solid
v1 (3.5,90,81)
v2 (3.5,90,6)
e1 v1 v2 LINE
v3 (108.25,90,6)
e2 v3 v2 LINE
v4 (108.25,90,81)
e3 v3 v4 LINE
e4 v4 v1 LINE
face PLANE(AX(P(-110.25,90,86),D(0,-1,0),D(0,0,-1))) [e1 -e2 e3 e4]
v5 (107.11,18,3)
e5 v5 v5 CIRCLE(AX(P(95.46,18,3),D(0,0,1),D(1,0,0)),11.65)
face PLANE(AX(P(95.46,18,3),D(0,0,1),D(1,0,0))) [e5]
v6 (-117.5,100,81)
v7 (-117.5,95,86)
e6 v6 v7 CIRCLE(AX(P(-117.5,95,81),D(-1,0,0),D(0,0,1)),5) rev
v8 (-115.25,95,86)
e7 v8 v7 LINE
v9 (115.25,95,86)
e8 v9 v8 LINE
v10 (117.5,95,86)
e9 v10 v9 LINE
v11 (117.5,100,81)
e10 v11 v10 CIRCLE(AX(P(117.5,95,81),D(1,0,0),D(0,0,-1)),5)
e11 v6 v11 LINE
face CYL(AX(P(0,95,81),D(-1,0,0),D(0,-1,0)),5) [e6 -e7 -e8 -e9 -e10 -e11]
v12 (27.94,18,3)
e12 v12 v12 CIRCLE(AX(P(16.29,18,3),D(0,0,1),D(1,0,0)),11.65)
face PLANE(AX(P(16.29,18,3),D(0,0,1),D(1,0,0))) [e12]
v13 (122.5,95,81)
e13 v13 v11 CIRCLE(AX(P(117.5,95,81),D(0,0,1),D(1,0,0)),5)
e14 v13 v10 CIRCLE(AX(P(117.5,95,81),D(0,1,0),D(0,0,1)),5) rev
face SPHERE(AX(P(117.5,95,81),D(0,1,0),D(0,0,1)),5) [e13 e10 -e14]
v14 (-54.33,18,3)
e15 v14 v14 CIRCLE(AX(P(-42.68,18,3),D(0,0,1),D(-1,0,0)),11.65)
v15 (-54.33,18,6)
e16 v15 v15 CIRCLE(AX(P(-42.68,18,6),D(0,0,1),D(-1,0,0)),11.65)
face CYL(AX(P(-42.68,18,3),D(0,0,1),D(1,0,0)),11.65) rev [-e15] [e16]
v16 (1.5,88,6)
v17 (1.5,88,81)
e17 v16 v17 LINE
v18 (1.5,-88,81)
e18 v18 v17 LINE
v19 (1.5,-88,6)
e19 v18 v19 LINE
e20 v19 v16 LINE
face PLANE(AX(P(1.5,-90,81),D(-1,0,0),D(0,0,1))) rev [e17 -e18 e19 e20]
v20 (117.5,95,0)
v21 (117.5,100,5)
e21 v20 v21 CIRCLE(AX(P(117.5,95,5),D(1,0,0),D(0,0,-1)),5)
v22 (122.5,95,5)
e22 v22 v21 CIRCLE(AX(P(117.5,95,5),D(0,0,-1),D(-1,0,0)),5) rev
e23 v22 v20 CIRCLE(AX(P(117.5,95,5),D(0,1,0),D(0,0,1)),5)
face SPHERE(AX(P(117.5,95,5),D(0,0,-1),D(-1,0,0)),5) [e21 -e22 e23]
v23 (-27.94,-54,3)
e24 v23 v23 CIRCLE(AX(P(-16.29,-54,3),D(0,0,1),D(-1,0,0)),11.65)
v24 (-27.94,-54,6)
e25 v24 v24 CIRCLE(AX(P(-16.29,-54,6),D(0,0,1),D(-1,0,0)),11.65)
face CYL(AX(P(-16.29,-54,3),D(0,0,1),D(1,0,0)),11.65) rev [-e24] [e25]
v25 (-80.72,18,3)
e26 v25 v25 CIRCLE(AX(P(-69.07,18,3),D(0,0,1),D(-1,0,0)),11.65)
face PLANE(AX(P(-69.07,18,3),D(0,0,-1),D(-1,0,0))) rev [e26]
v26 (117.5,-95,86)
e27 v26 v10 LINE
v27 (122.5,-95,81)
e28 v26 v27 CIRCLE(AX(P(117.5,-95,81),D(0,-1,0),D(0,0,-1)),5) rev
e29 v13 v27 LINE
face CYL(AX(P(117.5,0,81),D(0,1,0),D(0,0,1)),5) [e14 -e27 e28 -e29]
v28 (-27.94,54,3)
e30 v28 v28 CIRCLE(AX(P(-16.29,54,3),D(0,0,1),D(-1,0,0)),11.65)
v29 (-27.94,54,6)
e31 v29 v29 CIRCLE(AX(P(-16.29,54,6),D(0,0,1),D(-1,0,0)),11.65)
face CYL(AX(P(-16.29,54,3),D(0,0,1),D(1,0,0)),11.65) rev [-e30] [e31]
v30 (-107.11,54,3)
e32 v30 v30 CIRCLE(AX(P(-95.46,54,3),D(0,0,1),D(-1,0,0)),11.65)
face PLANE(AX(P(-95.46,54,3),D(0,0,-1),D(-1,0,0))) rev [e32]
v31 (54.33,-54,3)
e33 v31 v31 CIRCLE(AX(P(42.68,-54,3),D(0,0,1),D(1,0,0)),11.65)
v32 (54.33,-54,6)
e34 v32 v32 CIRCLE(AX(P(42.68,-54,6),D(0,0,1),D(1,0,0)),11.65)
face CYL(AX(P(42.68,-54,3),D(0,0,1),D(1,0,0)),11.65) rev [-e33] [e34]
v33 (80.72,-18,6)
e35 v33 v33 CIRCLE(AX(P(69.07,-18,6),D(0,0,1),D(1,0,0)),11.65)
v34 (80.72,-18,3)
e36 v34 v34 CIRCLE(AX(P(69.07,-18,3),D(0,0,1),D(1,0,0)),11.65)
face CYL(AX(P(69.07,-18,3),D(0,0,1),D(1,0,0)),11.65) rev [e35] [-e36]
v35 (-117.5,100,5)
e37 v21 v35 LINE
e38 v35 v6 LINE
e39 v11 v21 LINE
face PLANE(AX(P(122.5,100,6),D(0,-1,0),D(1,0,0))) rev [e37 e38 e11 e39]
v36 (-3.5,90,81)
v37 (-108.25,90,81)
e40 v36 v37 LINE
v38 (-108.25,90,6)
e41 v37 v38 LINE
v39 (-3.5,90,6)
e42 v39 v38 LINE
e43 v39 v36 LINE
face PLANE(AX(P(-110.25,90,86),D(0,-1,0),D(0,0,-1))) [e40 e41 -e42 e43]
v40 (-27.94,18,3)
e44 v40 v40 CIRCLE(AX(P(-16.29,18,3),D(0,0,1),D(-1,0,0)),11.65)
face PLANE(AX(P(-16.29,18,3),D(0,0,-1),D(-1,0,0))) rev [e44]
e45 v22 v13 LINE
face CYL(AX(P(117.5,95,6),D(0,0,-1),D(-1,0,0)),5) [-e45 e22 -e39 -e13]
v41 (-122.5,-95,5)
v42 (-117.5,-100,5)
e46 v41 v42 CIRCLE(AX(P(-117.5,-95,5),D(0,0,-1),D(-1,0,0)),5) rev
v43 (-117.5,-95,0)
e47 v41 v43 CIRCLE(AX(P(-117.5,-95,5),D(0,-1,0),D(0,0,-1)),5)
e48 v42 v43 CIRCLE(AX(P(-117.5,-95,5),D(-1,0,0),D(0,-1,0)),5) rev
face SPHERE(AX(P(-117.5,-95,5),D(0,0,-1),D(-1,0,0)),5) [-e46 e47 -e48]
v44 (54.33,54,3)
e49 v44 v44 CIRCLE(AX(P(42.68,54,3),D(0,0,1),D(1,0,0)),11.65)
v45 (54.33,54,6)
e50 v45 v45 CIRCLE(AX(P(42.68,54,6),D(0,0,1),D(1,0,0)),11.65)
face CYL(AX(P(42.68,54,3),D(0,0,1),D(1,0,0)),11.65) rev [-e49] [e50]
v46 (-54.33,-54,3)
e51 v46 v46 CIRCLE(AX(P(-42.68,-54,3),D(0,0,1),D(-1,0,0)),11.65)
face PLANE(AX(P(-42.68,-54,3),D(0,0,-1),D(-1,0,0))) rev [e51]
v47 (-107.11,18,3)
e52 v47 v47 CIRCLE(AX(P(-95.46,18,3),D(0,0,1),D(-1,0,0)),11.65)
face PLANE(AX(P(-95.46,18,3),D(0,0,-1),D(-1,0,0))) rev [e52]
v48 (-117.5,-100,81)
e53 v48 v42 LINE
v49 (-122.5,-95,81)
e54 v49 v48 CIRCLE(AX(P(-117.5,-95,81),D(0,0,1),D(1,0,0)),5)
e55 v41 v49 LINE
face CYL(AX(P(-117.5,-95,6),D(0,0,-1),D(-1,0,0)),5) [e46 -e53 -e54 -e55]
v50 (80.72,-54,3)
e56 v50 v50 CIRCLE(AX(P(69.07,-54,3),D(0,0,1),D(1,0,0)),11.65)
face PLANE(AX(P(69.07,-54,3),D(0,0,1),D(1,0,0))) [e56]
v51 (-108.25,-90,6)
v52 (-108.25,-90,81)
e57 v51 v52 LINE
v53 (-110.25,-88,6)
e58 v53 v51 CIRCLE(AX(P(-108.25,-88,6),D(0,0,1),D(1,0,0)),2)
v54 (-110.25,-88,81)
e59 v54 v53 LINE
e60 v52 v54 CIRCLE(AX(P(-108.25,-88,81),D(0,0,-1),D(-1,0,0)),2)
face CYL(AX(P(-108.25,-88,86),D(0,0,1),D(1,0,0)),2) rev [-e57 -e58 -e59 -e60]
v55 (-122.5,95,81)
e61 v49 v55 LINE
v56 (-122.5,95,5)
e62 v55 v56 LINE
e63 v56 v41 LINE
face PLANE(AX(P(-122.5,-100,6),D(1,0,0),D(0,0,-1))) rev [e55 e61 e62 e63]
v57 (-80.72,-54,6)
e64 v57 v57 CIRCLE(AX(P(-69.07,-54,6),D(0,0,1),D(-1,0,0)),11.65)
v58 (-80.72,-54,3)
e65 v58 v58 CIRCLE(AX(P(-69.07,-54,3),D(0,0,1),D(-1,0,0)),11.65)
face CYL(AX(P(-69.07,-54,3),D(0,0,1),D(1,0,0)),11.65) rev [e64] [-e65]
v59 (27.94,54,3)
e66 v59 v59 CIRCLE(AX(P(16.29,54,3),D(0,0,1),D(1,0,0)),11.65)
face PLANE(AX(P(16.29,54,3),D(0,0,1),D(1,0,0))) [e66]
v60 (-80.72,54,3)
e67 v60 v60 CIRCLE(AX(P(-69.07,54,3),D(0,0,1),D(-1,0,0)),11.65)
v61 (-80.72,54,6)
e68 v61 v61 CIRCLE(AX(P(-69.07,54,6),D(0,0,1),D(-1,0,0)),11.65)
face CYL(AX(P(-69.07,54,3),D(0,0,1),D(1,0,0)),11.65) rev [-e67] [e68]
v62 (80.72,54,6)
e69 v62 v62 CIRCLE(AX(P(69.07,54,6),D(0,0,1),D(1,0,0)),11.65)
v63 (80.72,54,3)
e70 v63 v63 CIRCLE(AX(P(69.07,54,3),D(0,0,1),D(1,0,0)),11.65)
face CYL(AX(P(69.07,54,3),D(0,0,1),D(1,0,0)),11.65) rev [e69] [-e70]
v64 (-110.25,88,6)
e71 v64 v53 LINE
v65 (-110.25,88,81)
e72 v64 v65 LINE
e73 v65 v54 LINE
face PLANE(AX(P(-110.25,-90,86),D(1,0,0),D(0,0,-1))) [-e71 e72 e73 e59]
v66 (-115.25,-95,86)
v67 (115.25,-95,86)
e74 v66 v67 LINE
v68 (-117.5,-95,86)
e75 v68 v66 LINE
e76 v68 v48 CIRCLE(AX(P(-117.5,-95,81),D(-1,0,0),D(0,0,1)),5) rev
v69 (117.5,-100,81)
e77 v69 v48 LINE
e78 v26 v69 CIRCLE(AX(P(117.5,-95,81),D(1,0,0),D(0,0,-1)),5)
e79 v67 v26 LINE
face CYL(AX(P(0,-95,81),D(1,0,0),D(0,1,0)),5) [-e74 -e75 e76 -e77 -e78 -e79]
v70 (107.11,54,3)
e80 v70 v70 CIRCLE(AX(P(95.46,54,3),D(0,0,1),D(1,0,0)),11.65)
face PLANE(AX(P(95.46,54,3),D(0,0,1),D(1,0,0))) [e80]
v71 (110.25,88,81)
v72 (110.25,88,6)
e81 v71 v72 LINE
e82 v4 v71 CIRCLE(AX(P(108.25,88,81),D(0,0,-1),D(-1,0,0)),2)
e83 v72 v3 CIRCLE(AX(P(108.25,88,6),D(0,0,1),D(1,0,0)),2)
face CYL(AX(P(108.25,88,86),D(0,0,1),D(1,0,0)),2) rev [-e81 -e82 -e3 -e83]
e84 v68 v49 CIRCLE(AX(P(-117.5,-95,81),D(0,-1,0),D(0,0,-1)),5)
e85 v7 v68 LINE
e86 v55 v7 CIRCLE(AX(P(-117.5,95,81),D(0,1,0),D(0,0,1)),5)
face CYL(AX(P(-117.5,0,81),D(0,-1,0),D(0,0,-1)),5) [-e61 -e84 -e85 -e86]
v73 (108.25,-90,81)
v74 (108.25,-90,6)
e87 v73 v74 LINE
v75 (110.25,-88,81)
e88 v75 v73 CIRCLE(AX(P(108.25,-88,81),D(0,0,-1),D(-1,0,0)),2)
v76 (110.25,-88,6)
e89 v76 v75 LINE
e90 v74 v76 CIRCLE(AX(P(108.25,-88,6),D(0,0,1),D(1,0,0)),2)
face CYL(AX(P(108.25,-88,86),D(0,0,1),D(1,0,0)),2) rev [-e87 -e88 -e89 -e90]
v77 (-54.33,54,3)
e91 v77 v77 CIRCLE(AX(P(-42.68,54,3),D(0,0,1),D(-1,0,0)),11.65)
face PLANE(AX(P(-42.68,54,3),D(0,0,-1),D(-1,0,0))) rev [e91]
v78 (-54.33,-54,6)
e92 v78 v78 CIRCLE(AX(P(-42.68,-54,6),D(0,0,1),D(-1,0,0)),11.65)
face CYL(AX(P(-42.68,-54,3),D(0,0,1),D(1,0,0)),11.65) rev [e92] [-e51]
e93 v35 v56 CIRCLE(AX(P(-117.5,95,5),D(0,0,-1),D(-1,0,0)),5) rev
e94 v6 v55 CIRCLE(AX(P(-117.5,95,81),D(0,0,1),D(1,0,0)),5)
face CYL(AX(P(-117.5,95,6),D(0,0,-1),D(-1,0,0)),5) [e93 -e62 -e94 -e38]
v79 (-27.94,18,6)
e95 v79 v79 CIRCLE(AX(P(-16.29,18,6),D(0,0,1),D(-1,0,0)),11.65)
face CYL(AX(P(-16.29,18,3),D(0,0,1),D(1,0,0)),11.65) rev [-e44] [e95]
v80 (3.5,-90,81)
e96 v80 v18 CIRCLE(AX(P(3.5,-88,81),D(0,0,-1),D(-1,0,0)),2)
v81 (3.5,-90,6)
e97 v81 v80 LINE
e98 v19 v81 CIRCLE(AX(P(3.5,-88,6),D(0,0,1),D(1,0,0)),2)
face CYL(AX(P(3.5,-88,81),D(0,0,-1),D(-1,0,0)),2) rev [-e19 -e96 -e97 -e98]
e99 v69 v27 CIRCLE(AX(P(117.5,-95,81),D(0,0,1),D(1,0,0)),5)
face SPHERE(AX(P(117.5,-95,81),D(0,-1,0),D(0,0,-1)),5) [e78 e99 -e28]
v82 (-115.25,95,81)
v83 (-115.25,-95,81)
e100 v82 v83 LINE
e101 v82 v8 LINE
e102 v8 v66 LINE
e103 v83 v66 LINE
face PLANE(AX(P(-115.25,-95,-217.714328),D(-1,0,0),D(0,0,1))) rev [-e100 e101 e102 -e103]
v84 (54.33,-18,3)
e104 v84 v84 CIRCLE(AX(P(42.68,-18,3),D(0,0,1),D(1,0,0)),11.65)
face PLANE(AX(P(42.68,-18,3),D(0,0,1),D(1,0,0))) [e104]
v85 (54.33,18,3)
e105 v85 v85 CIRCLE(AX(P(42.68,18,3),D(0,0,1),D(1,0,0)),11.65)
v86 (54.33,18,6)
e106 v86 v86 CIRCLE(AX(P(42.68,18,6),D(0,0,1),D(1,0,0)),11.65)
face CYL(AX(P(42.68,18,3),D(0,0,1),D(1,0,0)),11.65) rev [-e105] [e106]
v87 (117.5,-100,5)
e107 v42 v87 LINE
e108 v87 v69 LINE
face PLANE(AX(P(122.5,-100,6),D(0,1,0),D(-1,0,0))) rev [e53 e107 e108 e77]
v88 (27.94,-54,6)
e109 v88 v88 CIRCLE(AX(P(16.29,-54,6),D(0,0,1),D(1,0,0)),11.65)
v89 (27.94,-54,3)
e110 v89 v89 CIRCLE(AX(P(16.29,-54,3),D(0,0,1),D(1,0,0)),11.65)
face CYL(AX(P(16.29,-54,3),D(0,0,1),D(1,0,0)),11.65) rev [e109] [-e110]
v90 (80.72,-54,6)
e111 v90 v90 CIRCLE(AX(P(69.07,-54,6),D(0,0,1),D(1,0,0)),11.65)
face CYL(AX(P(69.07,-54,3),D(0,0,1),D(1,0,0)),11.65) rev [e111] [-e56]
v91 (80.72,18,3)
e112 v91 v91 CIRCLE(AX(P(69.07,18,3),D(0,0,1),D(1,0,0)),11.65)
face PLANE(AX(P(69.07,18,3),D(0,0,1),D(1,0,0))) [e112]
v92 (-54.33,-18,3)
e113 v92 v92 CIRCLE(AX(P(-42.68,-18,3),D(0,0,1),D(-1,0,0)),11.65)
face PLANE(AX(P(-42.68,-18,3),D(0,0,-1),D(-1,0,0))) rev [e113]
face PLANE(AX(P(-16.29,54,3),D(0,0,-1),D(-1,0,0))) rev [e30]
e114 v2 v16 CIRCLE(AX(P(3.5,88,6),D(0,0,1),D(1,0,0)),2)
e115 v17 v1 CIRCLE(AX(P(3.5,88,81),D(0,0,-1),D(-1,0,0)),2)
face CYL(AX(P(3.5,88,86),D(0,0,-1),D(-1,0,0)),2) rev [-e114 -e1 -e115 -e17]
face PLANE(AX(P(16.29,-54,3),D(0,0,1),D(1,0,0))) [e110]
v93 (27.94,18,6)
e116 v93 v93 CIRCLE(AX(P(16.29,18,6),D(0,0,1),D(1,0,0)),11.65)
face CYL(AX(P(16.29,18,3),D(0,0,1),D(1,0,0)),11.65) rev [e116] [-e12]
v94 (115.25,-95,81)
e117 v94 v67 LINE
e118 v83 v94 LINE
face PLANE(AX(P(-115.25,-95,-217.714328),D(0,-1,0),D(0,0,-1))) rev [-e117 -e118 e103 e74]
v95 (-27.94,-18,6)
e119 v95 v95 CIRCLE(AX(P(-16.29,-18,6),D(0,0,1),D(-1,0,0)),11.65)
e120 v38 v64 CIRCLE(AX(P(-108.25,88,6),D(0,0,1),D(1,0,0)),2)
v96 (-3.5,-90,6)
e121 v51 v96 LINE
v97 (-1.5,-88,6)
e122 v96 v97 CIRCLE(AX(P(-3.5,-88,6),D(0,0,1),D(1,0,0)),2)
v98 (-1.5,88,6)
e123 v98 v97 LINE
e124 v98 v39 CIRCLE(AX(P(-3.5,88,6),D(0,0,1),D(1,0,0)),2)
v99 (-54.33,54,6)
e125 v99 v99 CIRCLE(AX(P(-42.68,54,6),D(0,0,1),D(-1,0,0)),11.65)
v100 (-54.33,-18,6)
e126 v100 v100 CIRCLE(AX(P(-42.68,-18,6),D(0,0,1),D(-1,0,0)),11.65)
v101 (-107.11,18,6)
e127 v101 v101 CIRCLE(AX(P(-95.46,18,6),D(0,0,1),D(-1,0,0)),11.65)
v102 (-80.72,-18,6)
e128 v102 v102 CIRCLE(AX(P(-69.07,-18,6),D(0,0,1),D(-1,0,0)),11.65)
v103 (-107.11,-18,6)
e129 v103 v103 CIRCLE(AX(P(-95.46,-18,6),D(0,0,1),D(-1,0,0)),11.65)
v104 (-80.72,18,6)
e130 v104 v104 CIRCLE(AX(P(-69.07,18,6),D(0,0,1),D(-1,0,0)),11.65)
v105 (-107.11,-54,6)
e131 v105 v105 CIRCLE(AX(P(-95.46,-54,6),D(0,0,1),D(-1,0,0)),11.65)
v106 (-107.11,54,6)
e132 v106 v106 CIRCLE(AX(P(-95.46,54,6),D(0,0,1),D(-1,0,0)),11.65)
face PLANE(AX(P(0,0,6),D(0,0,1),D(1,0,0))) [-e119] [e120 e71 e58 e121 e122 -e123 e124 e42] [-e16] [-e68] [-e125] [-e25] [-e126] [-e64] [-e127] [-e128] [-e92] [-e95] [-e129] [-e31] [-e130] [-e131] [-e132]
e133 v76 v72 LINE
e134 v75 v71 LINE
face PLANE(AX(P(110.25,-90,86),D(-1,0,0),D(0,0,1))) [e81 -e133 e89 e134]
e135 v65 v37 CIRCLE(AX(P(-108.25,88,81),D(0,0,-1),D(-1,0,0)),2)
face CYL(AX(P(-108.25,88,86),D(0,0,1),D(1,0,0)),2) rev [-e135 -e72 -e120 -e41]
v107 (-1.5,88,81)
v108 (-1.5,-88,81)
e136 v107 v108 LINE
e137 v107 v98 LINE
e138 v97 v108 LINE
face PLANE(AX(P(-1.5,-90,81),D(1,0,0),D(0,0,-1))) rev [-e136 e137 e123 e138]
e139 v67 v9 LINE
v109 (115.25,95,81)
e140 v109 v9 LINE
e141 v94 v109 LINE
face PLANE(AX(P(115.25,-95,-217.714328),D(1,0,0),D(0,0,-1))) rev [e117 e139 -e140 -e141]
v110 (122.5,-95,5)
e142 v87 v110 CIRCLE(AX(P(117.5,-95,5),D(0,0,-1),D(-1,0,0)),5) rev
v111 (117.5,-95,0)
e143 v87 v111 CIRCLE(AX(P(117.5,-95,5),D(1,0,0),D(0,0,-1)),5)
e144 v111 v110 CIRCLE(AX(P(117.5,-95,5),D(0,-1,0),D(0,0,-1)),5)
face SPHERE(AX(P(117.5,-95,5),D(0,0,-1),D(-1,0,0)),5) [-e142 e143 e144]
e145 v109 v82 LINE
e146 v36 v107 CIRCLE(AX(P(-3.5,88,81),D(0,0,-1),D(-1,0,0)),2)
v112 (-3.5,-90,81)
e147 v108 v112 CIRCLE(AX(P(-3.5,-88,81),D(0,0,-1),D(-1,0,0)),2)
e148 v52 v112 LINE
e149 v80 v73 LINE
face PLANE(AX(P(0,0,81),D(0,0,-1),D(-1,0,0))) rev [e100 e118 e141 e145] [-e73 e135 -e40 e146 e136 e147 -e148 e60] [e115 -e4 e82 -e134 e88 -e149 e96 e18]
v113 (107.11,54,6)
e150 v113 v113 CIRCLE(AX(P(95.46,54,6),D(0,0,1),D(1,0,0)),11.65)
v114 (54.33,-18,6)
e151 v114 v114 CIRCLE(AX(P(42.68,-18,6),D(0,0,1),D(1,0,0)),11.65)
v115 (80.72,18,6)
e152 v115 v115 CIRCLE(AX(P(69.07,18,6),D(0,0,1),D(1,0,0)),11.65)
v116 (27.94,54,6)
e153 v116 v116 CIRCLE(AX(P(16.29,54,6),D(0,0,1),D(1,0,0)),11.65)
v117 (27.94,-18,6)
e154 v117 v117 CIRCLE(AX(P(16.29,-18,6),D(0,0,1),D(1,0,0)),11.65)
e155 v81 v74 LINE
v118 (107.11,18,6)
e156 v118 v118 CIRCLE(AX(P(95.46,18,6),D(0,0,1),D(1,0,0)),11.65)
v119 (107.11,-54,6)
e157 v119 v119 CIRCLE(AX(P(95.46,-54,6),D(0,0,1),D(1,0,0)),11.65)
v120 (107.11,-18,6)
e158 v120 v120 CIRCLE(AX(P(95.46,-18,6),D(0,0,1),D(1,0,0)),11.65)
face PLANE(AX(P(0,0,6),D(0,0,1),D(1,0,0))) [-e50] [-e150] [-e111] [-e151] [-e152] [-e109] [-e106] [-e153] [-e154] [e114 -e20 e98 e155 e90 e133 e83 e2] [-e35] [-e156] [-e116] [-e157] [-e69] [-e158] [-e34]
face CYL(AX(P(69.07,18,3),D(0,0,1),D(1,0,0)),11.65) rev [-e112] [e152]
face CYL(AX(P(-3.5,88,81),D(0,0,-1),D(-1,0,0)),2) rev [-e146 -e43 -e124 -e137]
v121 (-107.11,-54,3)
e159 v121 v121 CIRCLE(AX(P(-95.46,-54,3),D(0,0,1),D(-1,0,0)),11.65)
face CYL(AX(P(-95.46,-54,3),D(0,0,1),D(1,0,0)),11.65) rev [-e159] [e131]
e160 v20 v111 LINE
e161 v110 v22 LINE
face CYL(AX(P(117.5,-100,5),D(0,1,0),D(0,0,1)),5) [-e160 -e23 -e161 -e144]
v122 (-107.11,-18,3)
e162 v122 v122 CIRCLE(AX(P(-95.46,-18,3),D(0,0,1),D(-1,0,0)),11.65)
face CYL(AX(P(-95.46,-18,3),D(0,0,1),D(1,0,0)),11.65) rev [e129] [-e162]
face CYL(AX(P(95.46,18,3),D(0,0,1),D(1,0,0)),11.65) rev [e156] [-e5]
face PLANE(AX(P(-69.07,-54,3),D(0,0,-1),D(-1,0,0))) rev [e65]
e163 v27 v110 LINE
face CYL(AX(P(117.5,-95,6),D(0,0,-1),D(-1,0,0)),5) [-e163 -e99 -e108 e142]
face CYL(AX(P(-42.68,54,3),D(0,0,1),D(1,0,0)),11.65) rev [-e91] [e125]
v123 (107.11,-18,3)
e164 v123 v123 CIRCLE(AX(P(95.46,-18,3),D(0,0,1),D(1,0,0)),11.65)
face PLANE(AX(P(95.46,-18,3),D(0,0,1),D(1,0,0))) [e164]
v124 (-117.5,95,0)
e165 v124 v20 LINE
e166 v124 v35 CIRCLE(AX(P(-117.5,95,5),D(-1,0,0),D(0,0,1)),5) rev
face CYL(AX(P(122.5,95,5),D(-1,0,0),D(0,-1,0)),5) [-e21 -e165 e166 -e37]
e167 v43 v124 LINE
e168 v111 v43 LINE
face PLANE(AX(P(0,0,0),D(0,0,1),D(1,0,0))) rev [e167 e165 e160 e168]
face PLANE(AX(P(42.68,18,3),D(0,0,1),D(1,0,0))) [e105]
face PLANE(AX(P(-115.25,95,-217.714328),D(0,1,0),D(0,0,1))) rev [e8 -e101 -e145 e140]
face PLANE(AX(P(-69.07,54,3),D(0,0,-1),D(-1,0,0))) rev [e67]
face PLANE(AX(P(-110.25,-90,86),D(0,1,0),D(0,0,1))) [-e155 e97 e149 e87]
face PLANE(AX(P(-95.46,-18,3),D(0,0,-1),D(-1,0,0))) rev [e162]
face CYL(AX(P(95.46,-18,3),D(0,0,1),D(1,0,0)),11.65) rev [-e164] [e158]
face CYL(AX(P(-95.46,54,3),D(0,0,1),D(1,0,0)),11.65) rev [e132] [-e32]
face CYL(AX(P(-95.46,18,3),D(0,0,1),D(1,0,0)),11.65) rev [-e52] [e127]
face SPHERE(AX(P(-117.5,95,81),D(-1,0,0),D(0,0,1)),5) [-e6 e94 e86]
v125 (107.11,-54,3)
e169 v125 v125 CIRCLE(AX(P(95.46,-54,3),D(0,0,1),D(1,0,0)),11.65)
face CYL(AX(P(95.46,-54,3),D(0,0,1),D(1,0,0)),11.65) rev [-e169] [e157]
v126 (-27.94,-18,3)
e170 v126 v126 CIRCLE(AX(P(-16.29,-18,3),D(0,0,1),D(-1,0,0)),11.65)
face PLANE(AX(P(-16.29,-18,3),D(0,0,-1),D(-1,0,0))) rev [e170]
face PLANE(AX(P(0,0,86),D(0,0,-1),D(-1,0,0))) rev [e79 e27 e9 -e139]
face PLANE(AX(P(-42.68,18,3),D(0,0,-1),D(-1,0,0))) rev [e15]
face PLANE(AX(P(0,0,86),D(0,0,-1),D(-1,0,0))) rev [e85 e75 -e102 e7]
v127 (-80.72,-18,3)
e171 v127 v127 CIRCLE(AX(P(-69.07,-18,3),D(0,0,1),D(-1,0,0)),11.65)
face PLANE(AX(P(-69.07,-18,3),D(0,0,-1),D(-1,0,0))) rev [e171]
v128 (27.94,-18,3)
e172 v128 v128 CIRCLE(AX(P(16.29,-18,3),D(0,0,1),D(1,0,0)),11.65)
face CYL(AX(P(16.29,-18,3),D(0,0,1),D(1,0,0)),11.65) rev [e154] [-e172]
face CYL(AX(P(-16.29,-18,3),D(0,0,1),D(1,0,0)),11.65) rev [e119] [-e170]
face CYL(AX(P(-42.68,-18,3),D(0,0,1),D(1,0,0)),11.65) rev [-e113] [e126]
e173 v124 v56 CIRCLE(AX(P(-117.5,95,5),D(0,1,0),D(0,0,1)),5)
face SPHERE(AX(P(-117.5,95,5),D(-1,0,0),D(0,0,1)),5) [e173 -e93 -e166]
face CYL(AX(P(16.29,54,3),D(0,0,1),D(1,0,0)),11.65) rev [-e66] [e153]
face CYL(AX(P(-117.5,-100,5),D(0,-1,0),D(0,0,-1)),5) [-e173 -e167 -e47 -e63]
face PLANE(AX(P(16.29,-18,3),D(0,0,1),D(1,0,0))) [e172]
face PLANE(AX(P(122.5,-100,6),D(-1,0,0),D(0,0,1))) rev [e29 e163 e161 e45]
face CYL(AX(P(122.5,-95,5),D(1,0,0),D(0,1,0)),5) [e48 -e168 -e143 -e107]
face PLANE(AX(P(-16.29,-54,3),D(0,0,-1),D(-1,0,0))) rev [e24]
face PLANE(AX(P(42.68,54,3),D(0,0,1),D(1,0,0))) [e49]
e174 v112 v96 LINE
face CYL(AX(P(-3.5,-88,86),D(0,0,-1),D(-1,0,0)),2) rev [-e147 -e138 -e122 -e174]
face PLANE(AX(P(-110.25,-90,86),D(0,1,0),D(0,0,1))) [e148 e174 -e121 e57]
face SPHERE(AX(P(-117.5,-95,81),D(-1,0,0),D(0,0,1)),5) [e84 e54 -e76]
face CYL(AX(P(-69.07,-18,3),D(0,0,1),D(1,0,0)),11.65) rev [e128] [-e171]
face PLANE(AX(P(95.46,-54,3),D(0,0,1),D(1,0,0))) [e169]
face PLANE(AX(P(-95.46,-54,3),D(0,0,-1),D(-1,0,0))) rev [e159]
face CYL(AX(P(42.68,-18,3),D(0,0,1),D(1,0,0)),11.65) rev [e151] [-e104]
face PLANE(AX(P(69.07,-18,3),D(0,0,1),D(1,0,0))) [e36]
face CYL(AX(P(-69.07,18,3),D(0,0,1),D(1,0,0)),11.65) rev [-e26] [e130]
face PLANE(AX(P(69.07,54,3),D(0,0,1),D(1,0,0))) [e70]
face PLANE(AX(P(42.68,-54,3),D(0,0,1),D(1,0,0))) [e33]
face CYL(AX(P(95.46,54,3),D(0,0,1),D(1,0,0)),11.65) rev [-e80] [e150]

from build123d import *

# Parameters (mm, degrees)
SKETCH1_W           = 245
SKETCH1_H           = 200
BOSS_EXTRUDE1_DEPTH = 6
SKETCH2_W           = 245
SKETCH2_H           = 200
SKETCH2_W_2         = 220.5
SKETCH2_H_2         = 180
BOSS_EXTRUDE2_DEPTH = 80
SKETCH3_W           = 3
SKETCH3_H           = 180
BOSS_EXTRUDE3_DEPTH = 75
SKETCH5_W           = 230.5
SKETCH5_H           = 190
SKETCH5_W_2         = 220.5
SKETCH5_H_2         = 180
CUT_EXTRUDE1_DEPTH  = 5
SKETCH6_R           = 11.65
CUT_EXTRUDE2_DEPTH  = 3
FILLET1_R           = 5
FILLET2_R           = 2


with BuildPart() as part:
    # Sketch1 → Boss-Extrude1 (new body)
    with BuildSketch(Plane.XY):
        Rectangle(SKETCH1_W, SKETCH1_H)
    extrude(amount=BOSS_EXTRUDE1_DEPTH)

    # Sketch2 → Boss-Extrude2 (add)
    with BuildSketch(Plane.XY.offset(6)):
        Rectangle(SKETCH2_W, SKETCH2_H)
        Rectangle(SKETCH2_W_2, SKETCH2_H_2, mode=Mode.SUBTRACT)
    extrude(amount=BOSS_EXTRUDE2_DEPTH)

    # Sketch3 → Boss-Extrude3 (add)
    with BuildSketch(Plane.XY.offset(6)):
        Rectangle(SKETCH3_W, SKETCH3_H)
    extrude(amount=BOSS_EXTRUDE3_DEPTH)

    # Sketch5 → Cut-Extrude1 (cut)
    with BuildSketch(Plane.XY.offset(86)):
        Rectangle(SKETCH5_W, SKETCH5_H)
        Rectangle(SKETCH5_W_2, SKETCH5_H_2, mode=Mode.SUBTRACT)
    extrude(amount=-CUT_EXTRUDE1_DEPTH, mode=Mode.SUBTRACT)

    # Sketch6 → Cut-Extrude2 (cut)
    with BuildSketch(Plane.XY.offset(6)):
        with Locations((16.29, 54)):
            Circle(SKETCH6_R)
        with Locations((42.68, 54)):
            Circle(SKETCH6_R)
        with Locations((69.07, 54)):
            Circle(SKETCH6_R)
        with Locations((95.46, 54)):
            Circle(SKETCH6_R)
        with Locations((16.29, 18)):
            Circle(SKETCH6_R)
        with Locations((42.68, 18)):
            Circle(SKETCH6_R)
        with Locations((69.07, 18)):
            Circle(SKETCH6_R)
        with Locations((95.46, 18)):
            Circle(SKETCH6_R)
        with Locations((16.29, -18)):
            Circle(SKETCH6_R)
        with Locations((42.68, -18)):
            Circle(SKETCH6_R)
        with Locations((69.07, -18)):
            Circle(SKETCH6_R)
        with Locations((95.46, -18)):
            Circle(SKETCH6_R)
        with Locations((16.29, -54)):
            Circle(SKETCH6_R)
        with Locations((42.68, -54)):
            Circle(SKETCH6_R)
        with Locations((69.07, -54)):
            Circle(SKETCH6_R)
        with Locations((95.46, -54)):
            Circle(SKETCH6_R)
        with Locations(Location((-95.46, -54, 0), (0, 0, 180))):
            Circle(SKETCH6_R)
        with Locations(Location((-69.07, -54, 0), (0, 0, 180))):
            Circle(SKETCH6_R)
        with Locations(Location((-42.68, -54, 0), (0, 0, 180))):
            Circle(SKETCH6_R)
        with Locations(Location((-16.29, -54, 0), (0, 0, 180))):
            Circle(SKETCH6_R)
        with Locations(Location((-95.46, -18, 0), (0, 0, 180))):
            Circle(SKETCH6_R)
        with Locations(Location((-69.07, -18, 0), (0, 0, 180))):
            Circle(SKETCH6_R)
        with Locations(Location((-42.68, -18, 0), (0, 0, 180))):
            Circle(SKETCH6_R)
        with Locations(Location((-16.29, -18, 0), (0, 0, 180))):
            Circle(SKETCH6_R)
        with Locations(Location((-95.46, 18, 0), (0, 0, 180))):
            Circle(SKETCH6_R)
        with Locations(Location((-69.07, 18, 0), (0, 0, 180))):
            Circle(SKETCH6_R)
        with Locations(Location((-42.68, 18, 0), (0, 0, 180))):
            Circle(SKETCH6_R)
        with Locations(Location((-16.29, 18, 0), (0, 0, 180))):
            Circle(SKETCH6_R)
        with Locations(Location((-95.46, 54, 0), (0, 0, 180))):
            Circle(SKETCH6_R)
        with Locations(Location((-69.07, 54, 0), (0, 0, 180))):
            Circle(SKETCH6_R)
        with Locations(Location((-42.68, 54, 0), (0, 0, 180))):
            Circle(SKETCH6_R)
        with Locations(Location((-16.29, 54, 0), (0, 0, 180))):
            Circle(SKETCH6_R)
    extrude(amount=-CUT_EXTRUDE2_DEPTH, mode=Mode.SUBTRACT)

    # Fillet1
    fillet1_edges = [part.edges().sort_by_distance(p)[0] for p in [
        (122.5, 0, 86),
        (0, 100, 86),
        (-122.5, 0, 86),
        (0, -100, 86),
        (0, 100, 0),
        (122.5, 0, 0),
        (0, -100, 0),
        (-122.5, 0, 0),
        (-122.5, 100, 43),
        (122.5, 100, 43),
        (122.5, -100, 43),
        (-122.5, -100, 43),
    ]]
    fillet(fillet1_edges, radius=FILLET1_R - 0.0001)  # a hair under: the kernel refuses the full size

    # Fillet2
    fillet2_edges = [part.edges().sort_by_distance(p)[0] for p in [
        (1.5, -90, 43.5),
        (1.5, 90, 43.5),
        (-1.5, 90, 43.5),
        (-1.5, -90, 43.5),
        (-110.25, 90, 43.5),
        (-110.25, -90, 43.5),
        (110.25, -90, 43.5),
        (110.25, 90, 43.5),
    ]]
    fillet(fillet2_edges, radius=FILLET2_R)


solid = part.part
